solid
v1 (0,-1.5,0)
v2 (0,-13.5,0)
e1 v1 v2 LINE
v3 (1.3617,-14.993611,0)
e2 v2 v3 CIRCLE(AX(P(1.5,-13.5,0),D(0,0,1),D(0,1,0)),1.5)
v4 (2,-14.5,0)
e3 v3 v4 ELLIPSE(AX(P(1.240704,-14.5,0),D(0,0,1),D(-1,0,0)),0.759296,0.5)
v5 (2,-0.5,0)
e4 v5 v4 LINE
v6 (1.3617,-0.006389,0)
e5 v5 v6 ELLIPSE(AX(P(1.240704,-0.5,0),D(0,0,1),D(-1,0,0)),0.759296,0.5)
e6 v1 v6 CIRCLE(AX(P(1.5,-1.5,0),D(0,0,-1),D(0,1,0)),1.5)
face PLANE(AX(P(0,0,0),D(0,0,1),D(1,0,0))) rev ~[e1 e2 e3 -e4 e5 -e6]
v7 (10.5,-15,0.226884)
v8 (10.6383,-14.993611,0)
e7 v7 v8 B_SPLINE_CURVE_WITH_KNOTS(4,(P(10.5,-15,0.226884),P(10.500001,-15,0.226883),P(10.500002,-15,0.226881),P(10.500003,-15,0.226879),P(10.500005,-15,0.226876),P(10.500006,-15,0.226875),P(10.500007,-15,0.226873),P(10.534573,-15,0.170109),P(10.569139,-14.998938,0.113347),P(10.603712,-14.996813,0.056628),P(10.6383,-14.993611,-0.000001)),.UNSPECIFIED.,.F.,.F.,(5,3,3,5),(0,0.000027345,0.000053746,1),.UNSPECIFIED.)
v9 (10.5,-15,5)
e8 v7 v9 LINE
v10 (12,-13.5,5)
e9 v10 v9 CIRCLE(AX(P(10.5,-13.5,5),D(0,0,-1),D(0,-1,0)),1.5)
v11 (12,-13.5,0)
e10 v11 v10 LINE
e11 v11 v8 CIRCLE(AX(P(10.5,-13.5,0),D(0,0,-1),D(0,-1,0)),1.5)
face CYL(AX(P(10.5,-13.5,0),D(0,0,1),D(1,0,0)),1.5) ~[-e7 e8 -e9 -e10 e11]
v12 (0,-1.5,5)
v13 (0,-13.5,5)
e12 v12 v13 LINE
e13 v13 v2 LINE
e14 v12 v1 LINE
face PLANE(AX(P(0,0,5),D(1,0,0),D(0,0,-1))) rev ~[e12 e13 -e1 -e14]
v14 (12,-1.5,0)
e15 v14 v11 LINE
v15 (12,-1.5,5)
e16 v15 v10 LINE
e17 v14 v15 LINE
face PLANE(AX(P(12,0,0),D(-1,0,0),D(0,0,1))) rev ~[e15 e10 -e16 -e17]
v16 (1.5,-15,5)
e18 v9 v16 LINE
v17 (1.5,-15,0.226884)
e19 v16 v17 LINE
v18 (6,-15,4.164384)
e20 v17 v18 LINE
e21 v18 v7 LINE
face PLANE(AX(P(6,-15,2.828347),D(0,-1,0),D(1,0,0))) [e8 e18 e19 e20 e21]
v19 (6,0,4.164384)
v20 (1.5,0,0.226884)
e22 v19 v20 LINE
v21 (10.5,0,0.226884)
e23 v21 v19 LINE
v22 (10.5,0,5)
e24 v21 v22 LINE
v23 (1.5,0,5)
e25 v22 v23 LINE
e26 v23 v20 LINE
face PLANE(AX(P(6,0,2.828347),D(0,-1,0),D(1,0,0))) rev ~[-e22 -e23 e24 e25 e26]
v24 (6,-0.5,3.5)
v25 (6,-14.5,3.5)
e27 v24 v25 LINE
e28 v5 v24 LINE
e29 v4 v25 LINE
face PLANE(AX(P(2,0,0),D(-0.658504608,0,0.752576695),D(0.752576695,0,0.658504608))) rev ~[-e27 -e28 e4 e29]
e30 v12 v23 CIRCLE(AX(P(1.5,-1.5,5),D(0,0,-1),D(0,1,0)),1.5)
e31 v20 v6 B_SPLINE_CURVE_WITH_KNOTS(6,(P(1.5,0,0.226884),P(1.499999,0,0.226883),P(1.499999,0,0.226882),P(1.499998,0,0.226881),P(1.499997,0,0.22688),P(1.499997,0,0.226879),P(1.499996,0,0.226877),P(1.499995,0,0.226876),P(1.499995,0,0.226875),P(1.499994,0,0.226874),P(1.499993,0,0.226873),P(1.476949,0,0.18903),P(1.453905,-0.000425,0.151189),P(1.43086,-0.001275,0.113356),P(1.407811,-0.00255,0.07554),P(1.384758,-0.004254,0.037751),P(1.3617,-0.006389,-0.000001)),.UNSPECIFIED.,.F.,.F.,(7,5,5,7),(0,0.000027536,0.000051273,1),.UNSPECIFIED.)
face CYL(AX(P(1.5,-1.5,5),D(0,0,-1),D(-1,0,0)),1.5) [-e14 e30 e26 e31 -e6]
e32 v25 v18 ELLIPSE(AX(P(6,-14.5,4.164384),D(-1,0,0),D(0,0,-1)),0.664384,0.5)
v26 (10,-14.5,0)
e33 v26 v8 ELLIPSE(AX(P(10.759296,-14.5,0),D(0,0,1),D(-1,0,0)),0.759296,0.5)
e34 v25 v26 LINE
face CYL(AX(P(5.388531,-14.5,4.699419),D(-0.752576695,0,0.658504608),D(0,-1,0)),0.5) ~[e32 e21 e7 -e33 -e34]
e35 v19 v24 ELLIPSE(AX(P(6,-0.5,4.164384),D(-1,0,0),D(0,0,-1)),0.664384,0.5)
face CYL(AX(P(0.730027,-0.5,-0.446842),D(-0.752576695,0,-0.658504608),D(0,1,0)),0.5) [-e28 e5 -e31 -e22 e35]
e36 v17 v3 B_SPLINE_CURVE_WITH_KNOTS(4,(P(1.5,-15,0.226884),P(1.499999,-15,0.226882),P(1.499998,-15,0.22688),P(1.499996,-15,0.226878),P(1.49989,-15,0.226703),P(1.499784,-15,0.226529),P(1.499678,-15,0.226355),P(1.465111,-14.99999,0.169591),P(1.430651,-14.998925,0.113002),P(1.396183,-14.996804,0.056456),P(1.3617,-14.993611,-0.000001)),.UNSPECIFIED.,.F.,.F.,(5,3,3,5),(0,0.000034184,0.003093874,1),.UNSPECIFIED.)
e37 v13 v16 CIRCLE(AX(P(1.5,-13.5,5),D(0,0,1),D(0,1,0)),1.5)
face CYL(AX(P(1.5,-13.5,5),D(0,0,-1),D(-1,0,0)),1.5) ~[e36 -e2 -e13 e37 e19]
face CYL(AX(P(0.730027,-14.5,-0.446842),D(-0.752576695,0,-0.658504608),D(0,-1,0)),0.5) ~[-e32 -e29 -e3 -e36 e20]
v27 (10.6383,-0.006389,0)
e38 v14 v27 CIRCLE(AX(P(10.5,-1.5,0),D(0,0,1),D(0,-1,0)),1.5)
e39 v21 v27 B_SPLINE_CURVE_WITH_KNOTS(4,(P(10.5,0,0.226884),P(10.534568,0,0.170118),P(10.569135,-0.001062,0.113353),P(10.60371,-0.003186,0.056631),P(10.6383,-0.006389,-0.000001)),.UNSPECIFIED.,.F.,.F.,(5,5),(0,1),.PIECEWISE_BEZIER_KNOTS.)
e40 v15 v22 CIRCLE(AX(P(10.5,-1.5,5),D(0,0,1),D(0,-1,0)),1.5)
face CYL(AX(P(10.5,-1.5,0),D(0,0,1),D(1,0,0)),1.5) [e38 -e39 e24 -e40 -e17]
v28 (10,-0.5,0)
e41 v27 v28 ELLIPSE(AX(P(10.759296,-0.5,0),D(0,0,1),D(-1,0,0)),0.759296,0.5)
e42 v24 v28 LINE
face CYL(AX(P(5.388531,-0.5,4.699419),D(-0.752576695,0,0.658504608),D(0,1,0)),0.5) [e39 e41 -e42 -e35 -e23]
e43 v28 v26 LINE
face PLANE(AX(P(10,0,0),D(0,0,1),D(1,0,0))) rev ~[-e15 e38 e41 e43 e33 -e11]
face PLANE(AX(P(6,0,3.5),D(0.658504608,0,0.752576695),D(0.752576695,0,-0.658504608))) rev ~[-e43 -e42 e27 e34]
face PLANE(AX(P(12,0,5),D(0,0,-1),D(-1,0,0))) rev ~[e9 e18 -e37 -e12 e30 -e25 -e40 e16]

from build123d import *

# Parameters (mm, degrees)
F1_DEPTH     = 15
F2_R         = 1.5
F3_T4_DEPTH  = 7.8150729064
F3_T9_DEPTH  = 7.8150729064
F3_T14_DEPTH = 7.8150729064
F3_T19_DEPTH = 7.8150729064
F3_T25_DEPTH = 7.8150729064
F3_T29_DEPTH = 7.8150729064
F3_T36_DEPTH = 7.8150729064
F3_T40_DEPTH = 7.8150729064


# Not quite as in the source:
# - a fillet or chamfer that OpenCascade refuses, or shapes differently, is made with other operations: its cross-section is extruded or revolved along the edge and cut away or added


with BuildPart() as f1:
    # F0 (on Front) → F1 (new body)
    with BuildSketch(Plane.XZ):
        Polygon((0, 5), (0, 0), (2, 0), (6, 3.5), (10, 0), (12, 0), (12, 5), align=None)
    extrude(amount=F1_DEPTH)

    # F2
    f2_edges = [f1.edges().sort_by_distance(p)[0] for p in [
        (0, -15, 2.5),
        (12, -15, 2.5),
        (12, 0, 2.5),
        (0, 0, 2.5),
    ]]
    fillet(f2_edges, radius=F2_R)

    # F3: fillet of radius 0.5 on 4 edges, made by hand


with BuildPart() as f3_tool2:
    # F3_s3 → F3_t4 (new body)
    with BuildSketch(Plane(origin=(0.1920224944, 0, 0.1680196826), x_dir=(0, 1, 0), z_dir=(0.7525766947, 0, 0.6585046079))):
        with BuildLine():
            ThreePointArc((-15, -0.8170092157), (-14.8535533906, -1.1705626063), (-14.5, -1.3170092157))
            Line((-14.5, -1.3170092157), (-15, -1.3170092157))
            Line((-15, -1.3170092157), (-15, -0.8170092157))
        make_face()
    extrude(amount=F3_T4_DEPTH)

    split(bisect_by=Plane(origin=(4.3362831858, 0, 4.9557522124), x_dir=(0, 1, 0), z_dir=(-0.6585046079, 0, -0.7525766947)), keep=Keep.TOP)


with BuildPart() as f1_1:
    add(f1.part)

    # F3_t1: cut F3_tool2
    add(f3_tool2.part, mode=Mode.SUBTRACT)


with BuildPart() as f3_tool7:
    # F3_s8 → F3_t9 (new body)
    with BuildSketch(Plane(origin=(0.7229959458, 0, -0.6326214526), x_dir=(0, 1, 0), z_dir=(0.7525766947, 0, -0.6585046079))):
        with BuildLine():
            ThreePointArc((-15, 7.0850460787), (-14.8535533906, 6.7314926881), (-14.5, 6.5850460787))
            Line((-14.5, 6.5850460787), (-15, 6.5850460787))
            Line((-15, 6.5850460787), (-15, 7.0850460787))
        make_face()
    extrude(amount=F3_T9_DEPTH)

    split(bisect_by=Plane(origin=(0.8672566372, 0, -0.9911504425), x_dir=(0, 1, 0), z_dir=(0.6585046079, 0, -0.7525766947)), keep=Keep.TOP)


with BuildPart() as f1_2:
    add(f1_1.part)

    # F3_t6: cut F3_tool7
    add(f3_tool7.part, mode=Mode.SUBTRACT)


with BuildPart() as f3_tool12:
    # F3_s13 → F3_t14 (new body)
    with BuildSketch(Plane(origin=(0.1920224944, 0, 0.1680196826), x_dir=(0, 1, 0), z_dir=(0.7525766947, 0, 0.6585046079))):
        with BuildLine():
            ThreePointArc((0, -0.8170092157), (-0.1464466094, -1.1705626063), (-0.5, -1.3170092157))
            Line((-0.5, -1.3170092157), (0, -1.3170092157))
            Line((0, -1.3170092157), (0, -0.8170092157))
        make_face()
    extrude(amount=F3_T14_DEPTH)

    split(bisect_by=Plane(origin=(4.3362831858, 0, 4.9557522124), x_dir=(0, 1, 0), z_dir=(-0.6585046079, 0, -0.7525766947)), keep=Keep.TOP)


with BuildPart() as f1_3:
    add(f1_2.part)

    # F3_t11: cut F3_tool12
    add(f3_tool12.part, mode=Mode.SUBTRACT)


with BuildPart() as f3_tool17:
    # F3_s18 → F3_t19 (new body)
    with BuildSketch(Plane(origin=(0.7229959458, 0, -0.6326214526), x_dir=(0, 1, 0), z_dir=(0.7525766947, 0, -0.6585046079))):
        with BuildLine():
            ThreePointArc((0, 7.0850460787), (-0.1464466094, 6.7314926881), (-0.5, 6.5850460787))
            Line((-0.5, 6.5850460787), (0, 6.5850460787))
            Line((0, 6.5850460787), (0, 7.0850460787))
        make_face()
    extrude(amount=F3_T19_DEPTH)

    split(bisect_by=Plane(origin=(0.8672566372, 0, -0.9911504425), x_dir=(0, 1, 0), z_dir=(0.6585046079, 0, -0.7525766947)), keep=Keep.TOP)


with BuildPart() as f1_4:
    add(f1_3.part)

    # F3_t16: cut F3_tool17
    add(f3_tool17.part, mode=Mode.SUBTRACT)


with BuildPart() as f3_tool23:
    # F3_s24 → F3_t25 (new body)
    with BuildSketch(Plane(origin=(0.1920224944, 0, 0.1680196826), x_dir=(0, 1, 0), z_dir=(0.7525766947, 0, 0.6585046079))):
        with BuildLine():
            ThreePointArc((-15, -0.8170092157), (-14.8535533906, -1.1705626063), (-14.5, -1.3170092157))
            Line((-14.5, -1.3170092157), (-15, -1.3170092157))
            Line((-15, -1.3170092157), (-15, -0.8170092157))
        make_face()
    extrude(amount=F3_T25_DEPTH)

    split(bisect_by=Plane(origin=(4.3362831858, 0, 4.9557522124), x_dir=(0, 1, 0), z_dir=(0.6585046079, 0, 0.7525766947)), keep=Keep.TOP)


with BuildPart() as f3_tool27:
    # F3_s28 → F3_t29 (new body)
    with BuildSketch(Plane(origin=(0.7229959458, 0, -0.6326214526), x_dir=(0, 1, 0), z_dir=(0.7525766947, 0, -0.6585046079))):
        with BuildLine():
            ThreePointArc((-15, 7.0850460787), (-14.8535533906, 6.7314926881), (-14.5, 6.5850460787))
            Line((-14.5, 6.5850460787), (-15, 6.5850460787))
            Line((-15, 6.5850460787), (-15, 7.0850460787))
        make_face()
    extrude(amount=F3_T29_DEPTH)

    split(bisect_by=Plane(origin=(0.8672566372, 0, -0.9911504425), x_dir=(0, 1, 0), z_dir=(-0.6585046079, 0, 0.7525766947)), keep=Keep.TOP)


with BuildPart() as f3_tool23_1:
    add(f3_tool23.part)

    # F3_t31: intersect F3_tool27
    add(f3_tool27.part, mode=Mode.INTERSECT)


with BuildPart() as f1_5:
    add(f1_4.part)

    # F3_t21: cut F3_tool23
    add(f3_tool23_1.part, mode=Mode.SUBTRACT)


with BuildPart() as f3_tool34:
    # F3_s35 → F3_t36 (new body)
    with BuildSketch(Plane(origin=(0.1920224944, 0, 0.1680196826), x_dir=(0, 1, 0), z_dir=(0.7525766947, 0, 0.6585046079))):
        with BuildLine():
            ThreePointArc((0, -0.8170092157), (-0.1464466094, -1.1705626063), (-0.5, -1.3170092157))
            Line((-0.5, -1.3170092157), (0, -1.3170092157))
            Line((0, -1.3170092157), (0, -0.8170092157))
        make_face()
    extrude(amount=F3_T36_DEPTH)

    split(bisect_by=Plane(origin=(4.3362831858, 0, 4.9557522124), x_dir=(0, 1, 0), z_dir=(0.6585046079, 0, 0.7525766947)), keep=Keep.TOP)


with BuildPart() as f3_tool38:
    # F3_s39 → F3_t40 (new body)
    with BuildSketch(Plane(origin=(0.7229959458, 0, -0.6326214526), x_dir=(0, 1, 0), z_dir=(0.7525766947, 0, -0.6585046079))):
        with BuildLine():
            ThreePointArc((0, 7.0850460787), (-0.1464466094, 6.7314926881), (-0.5, 6.5850460787))
            Line((-0.5, 6.5850460787), (0, 6.5850460787))
            Line((0, 6.5850460787), (0, 7.0850460787))
        make_face()
    extrude(amount=F3_T40_DEPTH)

    split(bisect_by=Plane(origin=(0.8672566372, 0, -0.9911504425), x_dir=(0, 1, 0), z_dir=(-0.6585046079, 0, 0.7525766947)), keep=Keep.TOP)


with BuildPart() as f3_tool34_1:
    add(f3_tool34.part)

    # F3_t42: intersect F3_tool38
    add(f3_tool38.part, mode=Mode.INTERSECT)


with BuildPart() as f1_6:
    add(f1_5.part)

    # F3_t32: cut F3_tool34
    add(f3_tool34_1.part, mode=Mode.SUBTRACT)


solid = f1_6.part
